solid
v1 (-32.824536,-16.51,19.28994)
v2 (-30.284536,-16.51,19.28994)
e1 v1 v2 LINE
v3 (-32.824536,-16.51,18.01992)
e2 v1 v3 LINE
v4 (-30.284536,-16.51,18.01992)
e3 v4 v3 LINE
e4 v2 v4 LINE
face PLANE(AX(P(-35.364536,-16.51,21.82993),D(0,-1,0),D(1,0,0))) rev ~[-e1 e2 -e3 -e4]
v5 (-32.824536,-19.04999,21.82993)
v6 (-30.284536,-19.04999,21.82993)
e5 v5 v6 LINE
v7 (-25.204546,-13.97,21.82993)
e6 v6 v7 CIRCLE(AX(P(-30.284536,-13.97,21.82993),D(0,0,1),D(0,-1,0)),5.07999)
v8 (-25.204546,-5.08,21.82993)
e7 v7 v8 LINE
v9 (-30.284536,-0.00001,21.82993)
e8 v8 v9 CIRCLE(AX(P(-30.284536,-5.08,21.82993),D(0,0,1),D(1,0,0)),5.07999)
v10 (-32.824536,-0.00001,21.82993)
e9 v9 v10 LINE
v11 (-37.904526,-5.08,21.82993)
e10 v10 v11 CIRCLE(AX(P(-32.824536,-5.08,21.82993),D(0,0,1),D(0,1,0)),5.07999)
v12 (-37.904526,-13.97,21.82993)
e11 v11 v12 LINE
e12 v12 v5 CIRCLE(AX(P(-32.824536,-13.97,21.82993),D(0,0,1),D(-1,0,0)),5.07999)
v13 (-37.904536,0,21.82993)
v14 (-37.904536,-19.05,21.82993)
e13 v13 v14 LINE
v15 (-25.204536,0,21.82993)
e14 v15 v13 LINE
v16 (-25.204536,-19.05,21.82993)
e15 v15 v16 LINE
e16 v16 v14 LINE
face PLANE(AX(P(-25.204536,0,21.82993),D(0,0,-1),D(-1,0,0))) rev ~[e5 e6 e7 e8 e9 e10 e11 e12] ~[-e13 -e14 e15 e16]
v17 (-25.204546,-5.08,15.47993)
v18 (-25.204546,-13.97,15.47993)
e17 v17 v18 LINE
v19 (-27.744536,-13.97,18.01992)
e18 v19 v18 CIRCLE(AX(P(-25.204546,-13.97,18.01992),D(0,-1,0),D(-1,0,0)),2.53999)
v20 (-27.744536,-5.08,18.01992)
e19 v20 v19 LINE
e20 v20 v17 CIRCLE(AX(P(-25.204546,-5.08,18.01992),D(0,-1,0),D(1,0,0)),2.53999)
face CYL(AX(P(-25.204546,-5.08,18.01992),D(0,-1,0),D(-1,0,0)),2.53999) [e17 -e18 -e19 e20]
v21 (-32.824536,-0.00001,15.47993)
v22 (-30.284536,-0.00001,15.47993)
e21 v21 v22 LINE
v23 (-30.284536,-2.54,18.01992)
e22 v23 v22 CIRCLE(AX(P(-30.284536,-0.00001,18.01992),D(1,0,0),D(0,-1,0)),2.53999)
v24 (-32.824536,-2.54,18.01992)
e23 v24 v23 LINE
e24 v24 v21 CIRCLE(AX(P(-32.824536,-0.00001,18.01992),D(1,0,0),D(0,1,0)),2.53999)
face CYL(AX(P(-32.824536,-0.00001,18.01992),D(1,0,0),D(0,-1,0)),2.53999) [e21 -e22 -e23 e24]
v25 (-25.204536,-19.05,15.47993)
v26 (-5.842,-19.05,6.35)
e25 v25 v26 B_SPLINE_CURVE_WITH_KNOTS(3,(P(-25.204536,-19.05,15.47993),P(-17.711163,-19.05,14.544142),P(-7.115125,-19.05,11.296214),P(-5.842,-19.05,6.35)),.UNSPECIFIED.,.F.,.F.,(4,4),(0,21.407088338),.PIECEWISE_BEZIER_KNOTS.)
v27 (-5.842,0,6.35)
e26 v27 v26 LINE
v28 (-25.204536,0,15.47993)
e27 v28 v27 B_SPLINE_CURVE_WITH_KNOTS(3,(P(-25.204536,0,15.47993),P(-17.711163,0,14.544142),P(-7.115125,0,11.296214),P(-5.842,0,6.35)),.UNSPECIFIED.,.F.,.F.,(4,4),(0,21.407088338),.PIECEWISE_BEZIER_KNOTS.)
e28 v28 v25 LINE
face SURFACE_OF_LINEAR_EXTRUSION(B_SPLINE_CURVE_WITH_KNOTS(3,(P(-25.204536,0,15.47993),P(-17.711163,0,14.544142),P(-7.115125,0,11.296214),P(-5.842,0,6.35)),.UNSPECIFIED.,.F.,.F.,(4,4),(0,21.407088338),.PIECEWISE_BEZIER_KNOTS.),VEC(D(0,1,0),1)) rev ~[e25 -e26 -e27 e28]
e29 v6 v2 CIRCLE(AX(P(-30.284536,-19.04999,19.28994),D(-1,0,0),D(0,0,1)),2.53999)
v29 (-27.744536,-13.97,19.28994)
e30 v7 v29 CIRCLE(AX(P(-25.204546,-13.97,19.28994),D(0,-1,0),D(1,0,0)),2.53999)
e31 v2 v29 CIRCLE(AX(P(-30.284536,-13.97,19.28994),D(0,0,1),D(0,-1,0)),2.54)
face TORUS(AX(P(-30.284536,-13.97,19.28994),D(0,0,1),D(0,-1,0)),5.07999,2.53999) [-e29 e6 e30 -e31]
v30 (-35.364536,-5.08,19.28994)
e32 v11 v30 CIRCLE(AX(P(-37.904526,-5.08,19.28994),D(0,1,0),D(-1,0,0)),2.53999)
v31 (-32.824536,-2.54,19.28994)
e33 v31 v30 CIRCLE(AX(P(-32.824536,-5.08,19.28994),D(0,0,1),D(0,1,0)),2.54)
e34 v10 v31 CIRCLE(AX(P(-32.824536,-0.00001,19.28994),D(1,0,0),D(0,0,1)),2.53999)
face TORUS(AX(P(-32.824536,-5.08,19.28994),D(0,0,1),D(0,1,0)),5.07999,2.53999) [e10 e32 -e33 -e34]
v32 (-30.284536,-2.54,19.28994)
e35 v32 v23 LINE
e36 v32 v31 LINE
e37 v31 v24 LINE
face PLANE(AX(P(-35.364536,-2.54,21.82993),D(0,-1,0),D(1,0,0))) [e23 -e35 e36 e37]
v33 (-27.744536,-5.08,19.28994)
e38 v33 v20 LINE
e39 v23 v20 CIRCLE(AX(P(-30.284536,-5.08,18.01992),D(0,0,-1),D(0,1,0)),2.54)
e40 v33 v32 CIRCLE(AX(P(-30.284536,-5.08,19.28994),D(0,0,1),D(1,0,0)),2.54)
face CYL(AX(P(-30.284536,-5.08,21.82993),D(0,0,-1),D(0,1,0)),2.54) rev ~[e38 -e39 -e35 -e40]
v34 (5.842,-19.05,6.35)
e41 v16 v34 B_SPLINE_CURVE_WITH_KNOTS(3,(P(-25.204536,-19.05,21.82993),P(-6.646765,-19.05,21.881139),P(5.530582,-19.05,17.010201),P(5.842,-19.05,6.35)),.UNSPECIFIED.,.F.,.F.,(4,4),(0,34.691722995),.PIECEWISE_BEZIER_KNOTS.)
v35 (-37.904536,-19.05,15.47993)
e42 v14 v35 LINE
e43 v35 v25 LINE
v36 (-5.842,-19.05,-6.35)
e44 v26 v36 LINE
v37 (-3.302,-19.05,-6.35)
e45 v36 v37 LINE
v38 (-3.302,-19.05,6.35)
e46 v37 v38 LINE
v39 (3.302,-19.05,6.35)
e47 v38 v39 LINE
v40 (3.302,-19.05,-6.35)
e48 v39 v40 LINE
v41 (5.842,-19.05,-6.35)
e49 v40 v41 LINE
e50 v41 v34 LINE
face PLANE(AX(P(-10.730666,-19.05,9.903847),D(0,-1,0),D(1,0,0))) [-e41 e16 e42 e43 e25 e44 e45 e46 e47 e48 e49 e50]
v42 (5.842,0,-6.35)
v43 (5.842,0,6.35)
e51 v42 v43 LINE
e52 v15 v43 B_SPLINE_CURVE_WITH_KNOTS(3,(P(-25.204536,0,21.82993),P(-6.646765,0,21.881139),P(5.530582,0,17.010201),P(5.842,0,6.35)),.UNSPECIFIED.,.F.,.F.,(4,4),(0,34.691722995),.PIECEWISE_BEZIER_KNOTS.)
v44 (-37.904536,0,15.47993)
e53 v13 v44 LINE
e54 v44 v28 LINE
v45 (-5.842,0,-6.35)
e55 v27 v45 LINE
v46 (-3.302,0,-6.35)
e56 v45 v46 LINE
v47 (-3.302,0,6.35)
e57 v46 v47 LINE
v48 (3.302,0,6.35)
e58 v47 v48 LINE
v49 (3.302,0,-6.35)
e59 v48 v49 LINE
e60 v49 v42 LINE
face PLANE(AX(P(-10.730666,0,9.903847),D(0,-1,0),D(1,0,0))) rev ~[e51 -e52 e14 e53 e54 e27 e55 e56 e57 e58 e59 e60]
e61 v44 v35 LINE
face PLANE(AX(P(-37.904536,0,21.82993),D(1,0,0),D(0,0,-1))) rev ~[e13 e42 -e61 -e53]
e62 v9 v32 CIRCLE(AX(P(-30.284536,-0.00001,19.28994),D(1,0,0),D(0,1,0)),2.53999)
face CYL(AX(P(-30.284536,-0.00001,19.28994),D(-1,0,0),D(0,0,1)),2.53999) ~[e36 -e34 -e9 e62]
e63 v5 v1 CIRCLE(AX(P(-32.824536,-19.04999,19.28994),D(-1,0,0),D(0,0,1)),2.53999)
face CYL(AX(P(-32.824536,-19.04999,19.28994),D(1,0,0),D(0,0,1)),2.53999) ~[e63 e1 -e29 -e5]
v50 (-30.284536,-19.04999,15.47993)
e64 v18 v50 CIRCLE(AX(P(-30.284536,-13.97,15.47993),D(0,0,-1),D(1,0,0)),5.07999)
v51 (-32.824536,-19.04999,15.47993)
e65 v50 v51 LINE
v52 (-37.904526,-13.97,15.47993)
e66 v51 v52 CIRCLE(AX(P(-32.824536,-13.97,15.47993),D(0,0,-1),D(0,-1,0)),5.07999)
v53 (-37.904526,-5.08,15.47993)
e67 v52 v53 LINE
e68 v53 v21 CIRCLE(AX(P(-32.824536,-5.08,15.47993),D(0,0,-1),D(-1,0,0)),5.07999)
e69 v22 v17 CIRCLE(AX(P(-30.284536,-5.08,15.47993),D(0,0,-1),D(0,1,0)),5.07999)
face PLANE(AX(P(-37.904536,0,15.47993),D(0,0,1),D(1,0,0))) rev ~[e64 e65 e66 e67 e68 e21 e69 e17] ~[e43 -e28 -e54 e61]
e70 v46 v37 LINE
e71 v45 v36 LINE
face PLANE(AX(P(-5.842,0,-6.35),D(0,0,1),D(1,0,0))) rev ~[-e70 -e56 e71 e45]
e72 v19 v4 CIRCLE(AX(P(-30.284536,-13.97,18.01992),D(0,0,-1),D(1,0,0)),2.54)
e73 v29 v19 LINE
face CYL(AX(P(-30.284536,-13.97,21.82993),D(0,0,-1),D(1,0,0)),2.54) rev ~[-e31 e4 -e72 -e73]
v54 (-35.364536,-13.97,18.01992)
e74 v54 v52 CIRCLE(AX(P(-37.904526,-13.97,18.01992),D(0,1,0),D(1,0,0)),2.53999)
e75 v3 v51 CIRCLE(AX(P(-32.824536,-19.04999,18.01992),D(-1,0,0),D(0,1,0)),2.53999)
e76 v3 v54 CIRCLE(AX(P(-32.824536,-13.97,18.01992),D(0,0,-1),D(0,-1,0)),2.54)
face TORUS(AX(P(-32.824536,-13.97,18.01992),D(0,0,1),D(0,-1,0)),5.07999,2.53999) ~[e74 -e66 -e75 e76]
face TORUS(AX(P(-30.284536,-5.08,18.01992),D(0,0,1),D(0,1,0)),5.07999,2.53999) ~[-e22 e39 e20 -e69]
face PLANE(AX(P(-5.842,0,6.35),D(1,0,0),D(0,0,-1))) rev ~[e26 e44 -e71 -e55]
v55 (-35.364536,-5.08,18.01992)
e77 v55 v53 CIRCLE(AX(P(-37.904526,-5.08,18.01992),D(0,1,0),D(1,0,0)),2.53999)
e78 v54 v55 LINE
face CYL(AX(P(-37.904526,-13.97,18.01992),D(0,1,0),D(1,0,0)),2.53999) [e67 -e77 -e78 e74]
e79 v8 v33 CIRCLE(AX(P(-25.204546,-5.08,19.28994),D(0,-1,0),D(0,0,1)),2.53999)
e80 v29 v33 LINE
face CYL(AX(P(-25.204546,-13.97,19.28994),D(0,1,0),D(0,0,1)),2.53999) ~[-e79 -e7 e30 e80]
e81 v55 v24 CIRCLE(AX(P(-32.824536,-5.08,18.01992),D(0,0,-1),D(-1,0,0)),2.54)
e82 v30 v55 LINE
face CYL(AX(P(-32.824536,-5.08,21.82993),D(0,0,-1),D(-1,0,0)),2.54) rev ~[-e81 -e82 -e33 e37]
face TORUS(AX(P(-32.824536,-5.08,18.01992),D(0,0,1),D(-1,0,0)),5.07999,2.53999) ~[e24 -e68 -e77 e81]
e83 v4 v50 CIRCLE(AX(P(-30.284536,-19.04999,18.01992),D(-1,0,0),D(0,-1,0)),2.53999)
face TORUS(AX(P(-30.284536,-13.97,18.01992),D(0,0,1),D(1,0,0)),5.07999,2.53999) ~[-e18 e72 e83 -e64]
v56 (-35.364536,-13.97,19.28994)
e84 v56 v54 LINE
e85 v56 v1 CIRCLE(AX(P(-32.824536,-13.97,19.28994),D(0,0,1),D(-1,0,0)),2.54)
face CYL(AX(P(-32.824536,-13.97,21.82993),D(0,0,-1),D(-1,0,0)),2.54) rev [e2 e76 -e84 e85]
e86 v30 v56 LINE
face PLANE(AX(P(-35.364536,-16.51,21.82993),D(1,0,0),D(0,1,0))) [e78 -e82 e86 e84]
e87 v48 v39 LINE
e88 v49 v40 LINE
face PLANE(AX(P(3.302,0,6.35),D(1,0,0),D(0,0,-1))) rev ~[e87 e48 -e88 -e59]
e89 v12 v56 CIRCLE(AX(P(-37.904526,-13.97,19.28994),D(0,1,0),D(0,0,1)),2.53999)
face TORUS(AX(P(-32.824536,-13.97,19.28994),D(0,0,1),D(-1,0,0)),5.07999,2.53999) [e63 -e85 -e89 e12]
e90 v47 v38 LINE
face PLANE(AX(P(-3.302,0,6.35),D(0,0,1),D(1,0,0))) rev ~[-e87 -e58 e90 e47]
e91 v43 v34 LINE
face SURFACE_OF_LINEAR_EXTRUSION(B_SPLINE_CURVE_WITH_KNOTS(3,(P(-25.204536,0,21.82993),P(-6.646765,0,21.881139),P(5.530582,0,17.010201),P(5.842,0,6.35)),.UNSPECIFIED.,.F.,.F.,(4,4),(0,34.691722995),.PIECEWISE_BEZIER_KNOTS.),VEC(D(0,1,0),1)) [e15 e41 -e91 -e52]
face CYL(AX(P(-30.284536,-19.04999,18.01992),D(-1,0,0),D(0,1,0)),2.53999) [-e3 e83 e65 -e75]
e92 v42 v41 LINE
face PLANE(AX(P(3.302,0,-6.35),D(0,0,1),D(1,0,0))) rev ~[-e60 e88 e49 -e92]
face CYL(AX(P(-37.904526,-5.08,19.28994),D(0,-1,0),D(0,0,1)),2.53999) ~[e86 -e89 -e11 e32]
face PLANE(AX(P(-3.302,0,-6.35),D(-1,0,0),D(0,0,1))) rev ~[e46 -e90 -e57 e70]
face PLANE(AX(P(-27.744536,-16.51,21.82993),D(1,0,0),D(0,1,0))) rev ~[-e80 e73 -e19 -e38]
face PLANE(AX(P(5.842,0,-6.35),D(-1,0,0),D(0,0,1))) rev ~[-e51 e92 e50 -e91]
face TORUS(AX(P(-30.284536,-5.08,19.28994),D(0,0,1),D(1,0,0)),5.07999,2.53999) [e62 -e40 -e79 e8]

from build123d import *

# Parameters (mm, degrees)
F1_DEPTH = 19.05
F2_W     = 7.62
F2_H     = 13.97
F3_DEPTH = 6.35
F4_R     = 2.54
F5_R     = 2.53999
F6_R     = 2.53999


# Not quite as in the source:
# - a fillet or chamfer is up to 0.001 mm smaller than in the source, because OpenCascade refuses the exact size


with BuildPart() as f1:
    # F0 (on Front) → F1 (new body)
    with BuildSketch(Plane.XZ):
        with BuildLine():
            Line((-3.302, 6.35), (3.302, 6.35))
            Line((3.302, 6.35), (3.302, -6.35))
            Line((3.302, -6.35), (5.842, -6.35))
            Line((5.842, -6.35), (5.842, 6.35))
            add(Edge.make_bspline(
                [(-25.2045363516, 21.8299297452), (-6.6467649303, 21.8811389059), (5.5305822752, 17.0102007687), (5.842, 6.35)],
                knots=[0, 0, 0, 0, 34.6917229948, 34.6917229948, 34.6917229948, 34.6917229948], degree=3))
            Line((-25.2045363516, 21.8299297452), (-37.9045363516, 21.8299297452))
            Line((-37.9045363516, 21.8299297452), (-37.9045363516, 15.4799297452))
            Line((-37.9045363516, 15.4799297452), (-25.2045363516, 15.4799297452))
            add(Edge.make_bspline(
                [(-25.2045363516, 15.4799297452), (-17.7111625671, 14.5441424102), (-7.1151247248, 11.2962136045), (-5.842, 6.35)],
                knots=[0, 0, 0, 0, 21.4070883382, 21.4070883382, 21.4070883382, 21.4070883382], degree=3))
            Line((-5.842, 6.35), (-5.842, -6.35))
            Line((-5.842, -6.35), (-3.302, -6.35))
            Line((-3.302, -6.35), (-3.302, 6.35))
        make_face()
    extrude(amount=F1_DEPTH)

    # F2 (on face) → F3 (cut)
    with BuildSketch(Plane.XY.offset(21.8299297452)):
        with Locations((-31.5545363516, -9.525)):
            Rectangle(F2_W, F2_H)
    extrude(amount=-F3_DEPTH, mode=Mode.SUBTRACT)

    # F4
    f4_edges = [f1.edges().sort_by_distance(p)[0] for p in [
        (-27.744536, -2.54, 18.65493),
        (-35.364536, -2.54, 18.65493),
        (-35.364536, -16.51, 18.65493),
        (-27.744536, -16.51, 18.65493),
    ]]
    fillet(f4_edges, radius=F4_R)

    # F5 (radius 2.54 in the source; OpenCascade refuses exactly that, so slightly less here)
    f5_edges = [f1.edges().sort_by_distance(p)[0] for p in [
        (-35.364536, -9.525, 15.47993),
        (-34.620588, -15.766051, 15.47993),
        (-31.554536, -16.51, 15.47993),
        (-28.488485, -15.766051, 15.47993),
        (-27.744536, -9.525, 15.47993),
        (-31.554536, -2.54, 15.47993),
        (-34.620588, -3.283949, 15.47993),
        (-28.488485, -3.283949, 15.47993),
    ]]
    fillet(f5_edges, radius=F5_R)

    # F6 (radius 2.54 in the source; OpenCascade refuses exactly that, so slightly less here)
    f6_edges = [f1.edges().sort_by_distance(p)[0] for p in [
        (-31.554536, -16.51, 21.82993),
        (-34.620588, -15.766051, 21.82993),
        (-28.488485, -15.766051, 21.82993),
        (-35.364536, -9.525, 21.82993),
        (-27.744536, -9.525, 21.82993),
        (-28.488485, -3.283949, 21.82993),
        (-31.554536, -2.54, 21.82993),
        (-34.620588, -3.283949, 21.82993),
    ]]
    fillet(f6_edges, radius=F6_R)


solid = f1.part
